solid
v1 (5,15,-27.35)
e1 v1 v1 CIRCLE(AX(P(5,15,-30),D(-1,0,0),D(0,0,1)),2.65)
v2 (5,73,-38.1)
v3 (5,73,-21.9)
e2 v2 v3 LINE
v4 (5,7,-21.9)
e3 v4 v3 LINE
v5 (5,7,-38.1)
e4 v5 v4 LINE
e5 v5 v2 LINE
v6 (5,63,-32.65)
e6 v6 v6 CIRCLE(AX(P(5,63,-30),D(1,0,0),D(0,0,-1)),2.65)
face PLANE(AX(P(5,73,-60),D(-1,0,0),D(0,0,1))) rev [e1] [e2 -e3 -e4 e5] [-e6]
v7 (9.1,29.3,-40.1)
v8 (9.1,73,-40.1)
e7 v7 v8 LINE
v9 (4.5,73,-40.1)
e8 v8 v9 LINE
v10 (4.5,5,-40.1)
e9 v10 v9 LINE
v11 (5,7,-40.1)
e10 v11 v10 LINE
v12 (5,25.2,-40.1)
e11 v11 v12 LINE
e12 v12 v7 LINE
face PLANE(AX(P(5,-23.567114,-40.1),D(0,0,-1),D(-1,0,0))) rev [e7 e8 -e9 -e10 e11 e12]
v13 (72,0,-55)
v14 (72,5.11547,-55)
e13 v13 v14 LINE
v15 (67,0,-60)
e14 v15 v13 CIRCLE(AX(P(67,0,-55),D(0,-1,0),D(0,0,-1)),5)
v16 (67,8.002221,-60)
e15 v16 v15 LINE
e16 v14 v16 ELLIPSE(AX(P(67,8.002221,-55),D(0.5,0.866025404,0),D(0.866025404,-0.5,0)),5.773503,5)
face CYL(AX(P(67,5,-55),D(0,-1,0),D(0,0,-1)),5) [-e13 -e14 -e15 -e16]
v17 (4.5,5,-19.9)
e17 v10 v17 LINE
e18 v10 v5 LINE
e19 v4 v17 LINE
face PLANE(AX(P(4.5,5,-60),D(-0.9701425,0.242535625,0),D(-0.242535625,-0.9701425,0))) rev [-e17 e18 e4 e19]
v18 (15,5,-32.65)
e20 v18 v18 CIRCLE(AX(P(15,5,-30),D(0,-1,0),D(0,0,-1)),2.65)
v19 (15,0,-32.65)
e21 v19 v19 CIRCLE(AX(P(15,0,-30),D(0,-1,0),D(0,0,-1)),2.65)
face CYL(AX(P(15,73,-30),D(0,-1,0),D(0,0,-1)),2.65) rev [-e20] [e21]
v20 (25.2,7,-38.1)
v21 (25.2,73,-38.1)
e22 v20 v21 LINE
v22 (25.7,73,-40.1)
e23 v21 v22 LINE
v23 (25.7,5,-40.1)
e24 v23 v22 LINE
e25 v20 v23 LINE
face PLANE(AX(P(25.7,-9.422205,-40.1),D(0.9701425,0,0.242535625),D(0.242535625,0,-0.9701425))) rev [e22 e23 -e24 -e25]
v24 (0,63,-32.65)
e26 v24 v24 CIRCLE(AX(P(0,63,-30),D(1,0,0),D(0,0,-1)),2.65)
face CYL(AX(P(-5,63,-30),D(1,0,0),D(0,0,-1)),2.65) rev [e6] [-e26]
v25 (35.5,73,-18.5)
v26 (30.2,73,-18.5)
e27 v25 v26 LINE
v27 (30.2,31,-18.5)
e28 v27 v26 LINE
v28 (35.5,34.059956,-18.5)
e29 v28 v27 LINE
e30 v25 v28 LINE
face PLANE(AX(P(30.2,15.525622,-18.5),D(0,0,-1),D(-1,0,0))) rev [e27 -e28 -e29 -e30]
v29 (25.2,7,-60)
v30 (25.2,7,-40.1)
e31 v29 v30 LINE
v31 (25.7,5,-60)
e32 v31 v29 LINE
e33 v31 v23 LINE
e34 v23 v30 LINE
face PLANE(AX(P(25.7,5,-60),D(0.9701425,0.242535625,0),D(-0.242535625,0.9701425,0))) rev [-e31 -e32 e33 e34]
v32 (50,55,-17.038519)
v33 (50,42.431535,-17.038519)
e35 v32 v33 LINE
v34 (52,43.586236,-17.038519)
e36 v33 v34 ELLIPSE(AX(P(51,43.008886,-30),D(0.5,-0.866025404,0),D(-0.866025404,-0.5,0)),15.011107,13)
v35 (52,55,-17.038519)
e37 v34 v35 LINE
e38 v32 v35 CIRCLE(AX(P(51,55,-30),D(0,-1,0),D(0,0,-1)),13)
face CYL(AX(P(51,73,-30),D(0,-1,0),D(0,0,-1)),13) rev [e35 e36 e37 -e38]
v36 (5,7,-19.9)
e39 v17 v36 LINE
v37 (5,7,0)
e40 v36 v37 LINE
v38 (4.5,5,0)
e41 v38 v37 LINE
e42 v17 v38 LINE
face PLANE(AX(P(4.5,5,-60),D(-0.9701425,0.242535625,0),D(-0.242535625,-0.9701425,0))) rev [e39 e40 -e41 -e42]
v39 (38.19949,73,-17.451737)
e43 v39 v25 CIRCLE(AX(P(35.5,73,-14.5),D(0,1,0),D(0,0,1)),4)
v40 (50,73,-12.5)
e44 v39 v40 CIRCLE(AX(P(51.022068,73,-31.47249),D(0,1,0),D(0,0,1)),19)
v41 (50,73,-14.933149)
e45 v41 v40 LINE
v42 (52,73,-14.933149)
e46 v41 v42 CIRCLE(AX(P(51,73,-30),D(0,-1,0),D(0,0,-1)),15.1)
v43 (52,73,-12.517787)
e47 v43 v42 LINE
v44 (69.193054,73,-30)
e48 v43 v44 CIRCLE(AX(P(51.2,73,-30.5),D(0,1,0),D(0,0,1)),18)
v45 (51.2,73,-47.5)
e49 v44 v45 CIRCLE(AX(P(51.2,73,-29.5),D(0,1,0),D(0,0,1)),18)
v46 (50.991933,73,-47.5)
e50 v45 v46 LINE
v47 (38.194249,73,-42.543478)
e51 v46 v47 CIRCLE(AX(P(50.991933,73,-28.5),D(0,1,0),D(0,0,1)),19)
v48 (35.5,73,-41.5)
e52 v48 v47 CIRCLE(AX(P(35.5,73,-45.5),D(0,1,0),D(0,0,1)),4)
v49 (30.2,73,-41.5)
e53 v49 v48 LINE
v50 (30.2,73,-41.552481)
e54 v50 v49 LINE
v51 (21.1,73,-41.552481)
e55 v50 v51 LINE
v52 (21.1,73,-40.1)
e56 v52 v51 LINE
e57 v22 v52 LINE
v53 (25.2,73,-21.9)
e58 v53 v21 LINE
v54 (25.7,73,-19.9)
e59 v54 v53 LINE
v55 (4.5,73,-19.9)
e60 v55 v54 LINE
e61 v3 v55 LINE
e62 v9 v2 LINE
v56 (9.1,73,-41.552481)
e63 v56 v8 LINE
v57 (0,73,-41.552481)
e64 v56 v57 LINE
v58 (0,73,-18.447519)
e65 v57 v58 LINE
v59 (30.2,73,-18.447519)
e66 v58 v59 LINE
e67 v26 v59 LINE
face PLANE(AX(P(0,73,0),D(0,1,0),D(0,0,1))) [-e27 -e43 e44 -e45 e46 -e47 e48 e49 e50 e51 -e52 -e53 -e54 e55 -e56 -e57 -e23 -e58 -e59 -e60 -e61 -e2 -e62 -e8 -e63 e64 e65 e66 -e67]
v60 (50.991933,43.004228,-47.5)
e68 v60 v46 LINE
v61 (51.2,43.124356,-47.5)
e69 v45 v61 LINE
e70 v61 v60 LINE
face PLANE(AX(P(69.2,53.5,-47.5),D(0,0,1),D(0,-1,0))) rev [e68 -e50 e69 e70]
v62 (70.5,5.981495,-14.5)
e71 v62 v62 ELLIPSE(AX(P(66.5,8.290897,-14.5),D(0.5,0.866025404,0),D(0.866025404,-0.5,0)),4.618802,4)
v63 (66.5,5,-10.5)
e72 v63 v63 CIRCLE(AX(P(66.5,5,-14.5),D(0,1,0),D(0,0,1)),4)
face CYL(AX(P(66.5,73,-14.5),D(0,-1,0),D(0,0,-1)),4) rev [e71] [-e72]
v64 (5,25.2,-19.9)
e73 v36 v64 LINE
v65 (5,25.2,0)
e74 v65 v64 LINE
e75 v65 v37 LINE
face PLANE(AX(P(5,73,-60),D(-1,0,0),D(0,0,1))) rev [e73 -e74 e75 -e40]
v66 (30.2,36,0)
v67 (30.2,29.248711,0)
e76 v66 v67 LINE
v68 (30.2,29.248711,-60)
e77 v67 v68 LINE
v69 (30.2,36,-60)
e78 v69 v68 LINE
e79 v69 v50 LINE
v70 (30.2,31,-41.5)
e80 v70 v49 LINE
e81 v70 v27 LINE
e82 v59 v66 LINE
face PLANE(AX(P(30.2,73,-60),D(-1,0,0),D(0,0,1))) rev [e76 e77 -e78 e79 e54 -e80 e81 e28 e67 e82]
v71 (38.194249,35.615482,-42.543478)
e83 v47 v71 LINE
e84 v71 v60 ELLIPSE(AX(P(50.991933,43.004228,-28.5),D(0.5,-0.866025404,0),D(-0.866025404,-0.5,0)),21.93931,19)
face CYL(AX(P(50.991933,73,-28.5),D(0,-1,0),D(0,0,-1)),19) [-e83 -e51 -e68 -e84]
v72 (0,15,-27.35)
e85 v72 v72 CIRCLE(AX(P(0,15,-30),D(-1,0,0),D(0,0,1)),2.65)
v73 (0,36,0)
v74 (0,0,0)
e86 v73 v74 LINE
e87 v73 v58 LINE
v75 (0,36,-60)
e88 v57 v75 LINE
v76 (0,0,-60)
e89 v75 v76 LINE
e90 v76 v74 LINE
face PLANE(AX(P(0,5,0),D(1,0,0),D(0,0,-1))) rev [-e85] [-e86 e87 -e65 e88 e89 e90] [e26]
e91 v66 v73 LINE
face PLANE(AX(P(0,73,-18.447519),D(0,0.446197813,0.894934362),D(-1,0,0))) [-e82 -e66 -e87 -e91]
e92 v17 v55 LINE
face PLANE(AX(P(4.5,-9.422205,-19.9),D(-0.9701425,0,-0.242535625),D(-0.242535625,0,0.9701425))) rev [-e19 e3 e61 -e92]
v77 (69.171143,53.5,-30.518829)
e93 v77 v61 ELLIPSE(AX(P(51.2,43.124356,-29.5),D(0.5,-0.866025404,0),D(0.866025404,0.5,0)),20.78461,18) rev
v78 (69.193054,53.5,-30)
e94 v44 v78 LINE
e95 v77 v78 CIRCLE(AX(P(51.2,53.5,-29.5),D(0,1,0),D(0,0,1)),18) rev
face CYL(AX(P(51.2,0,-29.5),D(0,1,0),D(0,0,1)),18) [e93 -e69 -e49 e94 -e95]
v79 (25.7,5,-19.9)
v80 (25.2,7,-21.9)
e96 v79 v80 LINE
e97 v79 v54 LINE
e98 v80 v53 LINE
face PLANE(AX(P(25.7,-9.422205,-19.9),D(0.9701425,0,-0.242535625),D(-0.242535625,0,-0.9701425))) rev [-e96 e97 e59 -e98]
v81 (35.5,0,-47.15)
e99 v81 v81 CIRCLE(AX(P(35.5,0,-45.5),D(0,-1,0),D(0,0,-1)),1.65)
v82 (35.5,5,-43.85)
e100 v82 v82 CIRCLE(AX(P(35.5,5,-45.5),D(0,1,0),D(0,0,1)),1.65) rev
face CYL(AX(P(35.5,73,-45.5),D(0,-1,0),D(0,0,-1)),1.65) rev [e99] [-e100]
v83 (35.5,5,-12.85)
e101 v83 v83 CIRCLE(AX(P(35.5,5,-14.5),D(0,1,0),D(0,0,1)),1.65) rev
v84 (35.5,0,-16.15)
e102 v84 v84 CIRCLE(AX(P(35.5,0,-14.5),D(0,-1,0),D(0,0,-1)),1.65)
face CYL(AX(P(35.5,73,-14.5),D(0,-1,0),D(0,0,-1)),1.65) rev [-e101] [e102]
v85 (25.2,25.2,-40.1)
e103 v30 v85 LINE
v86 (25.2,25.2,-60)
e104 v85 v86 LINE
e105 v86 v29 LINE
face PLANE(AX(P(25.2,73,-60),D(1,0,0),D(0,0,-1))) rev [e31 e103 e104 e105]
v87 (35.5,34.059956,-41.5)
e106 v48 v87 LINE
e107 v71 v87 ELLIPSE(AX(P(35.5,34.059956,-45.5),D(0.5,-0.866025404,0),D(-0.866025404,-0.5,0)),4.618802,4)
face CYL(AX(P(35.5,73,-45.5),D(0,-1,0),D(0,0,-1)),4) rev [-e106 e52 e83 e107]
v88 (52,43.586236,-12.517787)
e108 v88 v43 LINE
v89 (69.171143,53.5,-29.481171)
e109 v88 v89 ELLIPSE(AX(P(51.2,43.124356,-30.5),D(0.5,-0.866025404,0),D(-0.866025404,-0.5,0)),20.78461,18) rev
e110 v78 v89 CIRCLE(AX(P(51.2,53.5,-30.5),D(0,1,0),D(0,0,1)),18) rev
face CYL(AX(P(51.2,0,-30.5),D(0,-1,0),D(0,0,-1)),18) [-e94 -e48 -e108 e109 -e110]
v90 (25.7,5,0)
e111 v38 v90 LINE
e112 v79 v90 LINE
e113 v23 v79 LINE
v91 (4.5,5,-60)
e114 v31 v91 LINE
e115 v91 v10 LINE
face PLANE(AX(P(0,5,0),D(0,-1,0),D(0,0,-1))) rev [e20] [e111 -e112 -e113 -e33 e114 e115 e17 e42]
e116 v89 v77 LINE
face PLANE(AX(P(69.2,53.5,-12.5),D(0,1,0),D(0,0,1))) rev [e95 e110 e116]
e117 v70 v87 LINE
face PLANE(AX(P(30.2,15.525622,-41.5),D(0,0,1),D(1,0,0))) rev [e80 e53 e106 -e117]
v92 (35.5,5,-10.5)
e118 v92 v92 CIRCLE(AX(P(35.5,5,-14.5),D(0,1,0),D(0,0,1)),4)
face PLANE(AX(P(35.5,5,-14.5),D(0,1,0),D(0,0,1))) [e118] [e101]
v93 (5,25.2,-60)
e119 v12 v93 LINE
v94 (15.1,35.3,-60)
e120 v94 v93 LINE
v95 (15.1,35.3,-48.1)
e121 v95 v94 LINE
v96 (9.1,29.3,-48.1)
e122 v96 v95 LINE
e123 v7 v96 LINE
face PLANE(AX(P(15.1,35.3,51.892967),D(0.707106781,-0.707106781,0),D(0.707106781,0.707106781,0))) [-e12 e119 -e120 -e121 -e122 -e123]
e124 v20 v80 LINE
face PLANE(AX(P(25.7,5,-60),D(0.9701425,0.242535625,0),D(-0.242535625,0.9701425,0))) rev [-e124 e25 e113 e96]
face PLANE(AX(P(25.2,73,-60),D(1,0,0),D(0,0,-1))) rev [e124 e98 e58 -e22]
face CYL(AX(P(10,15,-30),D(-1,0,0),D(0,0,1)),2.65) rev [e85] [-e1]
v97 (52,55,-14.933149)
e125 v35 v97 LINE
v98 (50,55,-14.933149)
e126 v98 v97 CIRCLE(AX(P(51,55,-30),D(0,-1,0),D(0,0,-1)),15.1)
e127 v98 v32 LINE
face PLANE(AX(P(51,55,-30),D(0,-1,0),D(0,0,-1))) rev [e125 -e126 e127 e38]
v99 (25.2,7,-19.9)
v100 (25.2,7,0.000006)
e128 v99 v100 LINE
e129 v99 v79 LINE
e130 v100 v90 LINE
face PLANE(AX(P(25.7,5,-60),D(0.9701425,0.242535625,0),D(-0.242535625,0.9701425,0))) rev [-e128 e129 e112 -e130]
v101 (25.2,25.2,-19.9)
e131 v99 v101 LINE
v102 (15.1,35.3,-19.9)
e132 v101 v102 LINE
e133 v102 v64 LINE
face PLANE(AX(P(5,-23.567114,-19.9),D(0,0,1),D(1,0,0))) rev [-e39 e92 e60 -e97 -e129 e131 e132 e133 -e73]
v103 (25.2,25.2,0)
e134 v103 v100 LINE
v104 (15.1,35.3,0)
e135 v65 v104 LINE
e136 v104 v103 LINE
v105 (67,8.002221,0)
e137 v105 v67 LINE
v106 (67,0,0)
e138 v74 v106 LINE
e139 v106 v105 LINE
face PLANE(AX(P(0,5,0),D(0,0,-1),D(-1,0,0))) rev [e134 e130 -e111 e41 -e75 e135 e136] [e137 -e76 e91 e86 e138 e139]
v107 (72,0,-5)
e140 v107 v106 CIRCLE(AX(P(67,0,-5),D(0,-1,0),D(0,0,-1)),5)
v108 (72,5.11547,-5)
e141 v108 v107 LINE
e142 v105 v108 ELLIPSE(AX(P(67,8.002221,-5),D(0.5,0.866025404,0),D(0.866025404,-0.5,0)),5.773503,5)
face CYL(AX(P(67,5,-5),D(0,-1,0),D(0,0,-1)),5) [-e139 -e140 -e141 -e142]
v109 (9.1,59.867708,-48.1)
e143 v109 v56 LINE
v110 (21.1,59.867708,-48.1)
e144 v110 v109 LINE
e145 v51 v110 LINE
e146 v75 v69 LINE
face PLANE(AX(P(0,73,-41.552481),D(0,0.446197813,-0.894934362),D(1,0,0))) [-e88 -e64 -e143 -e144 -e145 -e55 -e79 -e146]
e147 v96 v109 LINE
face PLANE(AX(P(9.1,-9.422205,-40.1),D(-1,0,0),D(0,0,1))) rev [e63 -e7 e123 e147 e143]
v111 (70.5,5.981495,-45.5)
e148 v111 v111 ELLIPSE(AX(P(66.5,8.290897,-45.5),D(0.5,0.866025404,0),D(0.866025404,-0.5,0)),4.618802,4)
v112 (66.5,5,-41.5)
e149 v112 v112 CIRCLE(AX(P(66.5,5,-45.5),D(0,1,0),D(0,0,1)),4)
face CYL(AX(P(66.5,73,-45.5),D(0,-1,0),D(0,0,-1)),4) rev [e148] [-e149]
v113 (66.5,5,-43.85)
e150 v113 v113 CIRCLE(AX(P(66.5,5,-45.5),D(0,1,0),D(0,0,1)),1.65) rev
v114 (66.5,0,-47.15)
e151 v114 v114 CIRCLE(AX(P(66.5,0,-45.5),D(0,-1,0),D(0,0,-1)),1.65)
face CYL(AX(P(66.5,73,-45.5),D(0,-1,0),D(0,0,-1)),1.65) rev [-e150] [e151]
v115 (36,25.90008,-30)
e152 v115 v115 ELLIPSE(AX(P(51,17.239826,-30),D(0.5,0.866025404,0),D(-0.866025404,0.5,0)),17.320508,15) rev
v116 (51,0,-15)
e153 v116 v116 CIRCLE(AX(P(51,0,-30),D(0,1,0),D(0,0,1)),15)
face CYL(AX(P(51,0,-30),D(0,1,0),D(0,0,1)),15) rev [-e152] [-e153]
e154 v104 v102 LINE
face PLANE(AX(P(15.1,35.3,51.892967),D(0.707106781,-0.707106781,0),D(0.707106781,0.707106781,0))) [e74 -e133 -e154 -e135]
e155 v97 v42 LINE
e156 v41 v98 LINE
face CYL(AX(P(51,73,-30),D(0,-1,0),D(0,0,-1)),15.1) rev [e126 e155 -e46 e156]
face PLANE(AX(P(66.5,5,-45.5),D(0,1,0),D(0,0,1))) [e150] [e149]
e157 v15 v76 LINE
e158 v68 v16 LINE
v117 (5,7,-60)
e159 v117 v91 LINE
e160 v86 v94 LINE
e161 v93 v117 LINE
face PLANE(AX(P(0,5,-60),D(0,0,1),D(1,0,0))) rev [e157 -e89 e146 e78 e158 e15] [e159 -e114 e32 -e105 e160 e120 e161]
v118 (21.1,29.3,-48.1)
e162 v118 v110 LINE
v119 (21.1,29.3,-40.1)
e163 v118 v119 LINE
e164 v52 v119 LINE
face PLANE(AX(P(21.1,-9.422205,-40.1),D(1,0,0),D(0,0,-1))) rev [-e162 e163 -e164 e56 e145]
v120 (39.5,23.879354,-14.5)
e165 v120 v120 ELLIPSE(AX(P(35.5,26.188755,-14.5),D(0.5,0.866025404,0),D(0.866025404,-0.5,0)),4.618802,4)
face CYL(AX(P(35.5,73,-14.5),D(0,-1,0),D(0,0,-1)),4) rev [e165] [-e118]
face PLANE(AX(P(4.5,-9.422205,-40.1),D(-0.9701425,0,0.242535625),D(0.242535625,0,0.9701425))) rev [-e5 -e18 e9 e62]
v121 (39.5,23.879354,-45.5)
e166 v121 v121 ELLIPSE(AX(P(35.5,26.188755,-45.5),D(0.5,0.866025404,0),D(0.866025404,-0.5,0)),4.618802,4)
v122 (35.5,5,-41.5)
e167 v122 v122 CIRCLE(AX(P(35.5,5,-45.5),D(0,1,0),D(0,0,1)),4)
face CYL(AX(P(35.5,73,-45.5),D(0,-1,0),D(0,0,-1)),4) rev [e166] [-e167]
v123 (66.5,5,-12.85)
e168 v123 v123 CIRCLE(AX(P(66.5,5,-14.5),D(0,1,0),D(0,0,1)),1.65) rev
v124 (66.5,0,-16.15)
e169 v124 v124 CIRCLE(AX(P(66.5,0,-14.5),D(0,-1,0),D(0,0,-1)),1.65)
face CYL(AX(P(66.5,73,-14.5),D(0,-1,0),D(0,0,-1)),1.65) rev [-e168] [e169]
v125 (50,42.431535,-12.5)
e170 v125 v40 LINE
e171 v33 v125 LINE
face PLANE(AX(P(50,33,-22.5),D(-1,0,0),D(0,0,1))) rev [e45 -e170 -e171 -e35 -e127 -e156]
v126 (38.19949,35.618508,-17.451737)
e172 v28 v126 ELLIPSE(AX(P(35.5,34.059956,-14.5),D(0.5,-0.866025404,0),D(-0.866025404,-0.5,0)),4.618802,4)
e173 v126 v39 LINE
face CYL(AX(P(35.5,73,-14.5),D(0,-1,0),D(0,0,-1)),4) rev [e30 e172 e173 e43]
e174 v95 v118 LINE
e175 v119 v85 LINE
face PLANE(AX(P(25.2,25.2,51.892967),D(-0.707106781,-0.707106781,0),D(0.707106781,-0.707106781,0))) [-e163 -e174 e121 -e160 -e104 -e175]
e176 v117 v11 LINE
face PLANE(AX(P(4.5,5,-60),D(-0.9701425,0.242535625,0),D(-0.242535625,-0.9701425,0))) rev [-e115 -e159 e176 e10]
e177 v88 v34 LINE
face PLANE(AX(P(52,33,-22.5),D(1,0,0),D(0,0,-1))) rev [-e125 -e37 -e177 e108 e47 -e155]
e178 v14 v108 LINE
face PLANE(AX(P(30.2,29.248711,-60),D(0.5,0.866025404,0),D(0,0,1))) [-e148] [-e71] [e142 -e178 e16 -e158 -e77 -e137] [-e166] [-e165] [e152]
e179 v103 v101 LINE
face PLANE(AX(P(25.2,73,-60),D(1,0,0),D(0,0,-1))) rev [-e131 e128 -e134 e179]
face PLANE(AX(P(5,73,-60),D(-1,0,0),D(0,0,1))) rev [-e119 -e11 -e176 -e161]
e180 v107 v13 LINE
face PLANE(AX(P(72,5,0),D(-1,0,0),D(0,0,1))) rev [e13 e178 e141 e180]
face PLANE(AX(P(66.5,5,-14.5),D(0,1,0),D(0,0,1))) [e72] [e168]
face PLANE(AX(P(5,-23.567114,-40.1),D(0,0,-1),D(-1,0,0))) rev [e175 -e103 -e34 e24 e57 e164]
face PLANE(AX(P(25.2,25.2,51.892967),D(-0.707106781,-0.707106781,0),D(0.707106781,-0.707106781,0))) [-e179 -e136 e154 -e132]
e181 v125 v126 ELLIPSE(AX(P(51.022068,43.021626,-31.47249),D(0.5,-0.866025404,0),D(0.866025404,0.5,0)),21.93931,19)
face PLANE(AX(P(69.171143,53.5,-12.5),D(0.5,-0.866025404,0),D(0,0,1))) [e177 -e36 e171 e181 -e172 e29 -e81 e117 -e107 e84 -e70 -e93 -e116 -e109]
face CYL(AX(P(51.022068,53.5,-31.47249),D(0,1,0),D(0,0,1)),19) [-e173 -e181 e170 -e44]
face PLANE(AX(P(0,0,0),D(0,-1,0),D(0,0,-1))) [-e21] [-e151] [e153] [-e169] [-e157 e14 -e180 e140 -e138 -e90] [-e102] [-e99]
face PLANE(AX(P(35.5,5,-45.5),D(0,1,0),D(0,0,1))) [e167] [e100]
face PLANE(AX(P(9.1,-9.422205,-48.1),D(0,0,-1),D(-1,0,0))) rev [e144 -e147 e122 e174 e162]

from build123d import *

# Parameters (mm, degrees)
SKETCH1_W               = 72
SKETCH1_H               = 60
BOSS_EXTRUDE1_DEPTH     = 5
SKETCH2_W               = 5
SKETCH2_H               = 60
BOSS_EXTRUDE2_DEPTH     = 68
SKETCH3_W               = 5
SKETCH3_H               = 60
BOSS_EXTRUDE3_DEPTH     = 68
BOSS_EXTRUDE4_DEPTH     = 60
CHAMFER1_SIZE           = 42
CHAMFER1_SIZE_2         = 24.248711306
CUT_EXTRUDE8_REACH      = 120.798
SKETCH12_W              = 20.2
SKETCH12_H              = 20.2
CUT_EXTRUDE1_DEPTH      = 116.792918609
CUT_EXTRUDE1_DEPTH_BACK = 116.792918609
SKETCH5_R               = 15
SKETCH8_R               = 2.65
CUT_EXTRUDE5_DEPTH      = 10
CUT_EXTRUDE6_DEPTH      = 119.798148134
CUT_EXTRUDE6_DEPTH_BACK = 119.798148134
SKETCH9_R               = 2.65
FILLET1_R               = 5
SKETCH10_R              = 2.65
CUT_EXTRUDE7_DEPTH      = 10
CUT_EXTRUDE9_DEPTH      = 119.798148134
CUT_EXTRUDE9_DEPTH_BACK = 119.798148134
CUT_EXTRUDE10_REACH     = 120.798
SKETCH14_W              = 12
SKETCH14_H              = 8
SKETCH15_W              = 35
SKETCH15_H              = 19.5
BOSS_EXTRUDE5_DEPTH     = 39
SKETCH16_R              = 15.1
CUT_EXTRUDE11_DEPTH     = 109.669222874
SKETCH17_R              = 13
CUT_EXTRUDE12_DEPTH     = 108.917792787
FILLET2_R               = 18
CHAMFER2_START          = 51.76396
CHAMFER2_OUTLINE_R      = 13
CHAMFER2_DEPTH          = 1.73604
CHAMFER2_START_2        = 31
CHAMFER2_2_OUTLINE_R    = 13
CHAMFER2_2_DEPTH        = 20.76396
CHAMFER2_START_3        = -47.5
CHAMFER2_3_DEPTH        = 35
SKETCH6_R               = 1.65
CUT_EXTRUDE2_DEPTH      = 119.798148134
SKETCH7_R               = 4
CUT_EXTRUDE4_DEPTH      = 116.792918609
SKETCH18_W              = 2
SKETCH18_H              = 15
CUT_EXTRUDE13_DEPTH     = 40
CHAMFER3_DEPTH          = 34.854175091
CUT_EXTRUDE14_REACH     = 120.798
SKETCH19_W              = 5.3
SKETCH19_H              = 10
FILLET3_R               = 19


with BuildPart() as part:
    # Sketch1 → Boss-Extrude1 (new body)
    with BuildSketch(Plane(origin=(0, 0, 0), x_dir=(1, 0, 0), z_dir=(0, 1, 0))):
        with Locations((36, 30)):
            Rectangle(SKETCH1_W, SKETCH1_H)
    extrude(amount=BOSS_EXTRUDE1_DEPTH)

    # Sketch2 → Boss-Extrude2 (add)
    with BuildSketch(Plane(origin=(0, 5, 0), x_dir=(1, 0, 0), z_dir=(0, 1, 0))):
        with Locations((2.5, 30)):
            Rectangle(SKETCH2_W, SKETCH2_H)
    extrude(amount=BOSS_EXTRUDE2_DEPTH)

    # Sketch3 → Boss-Extrude3 (add)
    with BuildSketch(Plane(origin=(0, 5, 0), x_dir=(1, 0, 0), z_dir=(0, 1, 0))):
        with Locations((27.7, 30)):
            Rectangle(SKETCH3_W, SKETCH3_H)
    extrude(amount=BOSS_EXTRUDE3_DEPTH)

    # Sketch11 → Boss-Extrude4 (add)
    with BuildSketch(Plane(origin=(0, 0, -60), x_dir=(-1, 0, 0), z_dir=(0, 0, -1))):
        Polygon((-25.2, 25.2), (-15.1, 35.3), (-5, 25.2), (-5, 73), (-25.2, 73), align=None)
    extrude(amount=-BOSS_EXTRUDE4_DEPTH)

    # Chamfer1
    # the kernel refuses this chamfer: 42, 24.248711306 mm, written as the material it adds along each edge
    with BuildSketch(Plane(origin=(30.2, 5, -60), x_dir=(1, 0, 0), z_dir=(0, 0, 1))) as chamfer1_piece_1_section:
        Polygon((CHAMFER1_SIZE, 0), (0, CHAMFER1_SIZE_2), (0, 0), align=None)
    chamfer1_piece_1 = extrude(amount=60, mode=Mode.PRIVATE)
    chamfer1_piece_1 = split(chamfer1_piece_1, bisect_by=Plane(origin=(72, 5, -60), z_dir=(-1, 0, 0)), keep=Keep.TOP, mode=Mode.PRIVATE)
    add(chamfer1_piece_1)

    # Cut-Extrude8: up to this face of the body (flat: up to its plane)
    cut_extrude8_end = Plane(part.part.faces().sort_by_distance((15.1, 5, -30))[0])
    # Sketch12 → Cut-Extrude8 (cut, up to the picked face)
    with BuildSketch(Plane(origin=(0, 73, 0), x_dir=(1, 0, 0), z_dir=(0, 1, 0)), mode=Mode.PRIVATE) as cut_extrude8_sk1:
        with Locations((15.1, 30)):
            Rectangle(SKETCH12_W, SKETCH12_H)
    cut_extrude8_tool1 = split(extrude(cut_extrude8_sk1.sketch, amount=-CUT_EXTRUDE8_REACH, mode=Mode.PRIVATE), bisect_by=cut_extrude8_end, keep=Keep.BOTH, mode=Mode.PRIVATE)
    add(cut_extrude8_tool1.solids().sort_by(Axis((15.1, 73, -30), (0, -1, 0)))[0], mode=Mode.SUBTRACT)

    # Sketch5 → Cut-Extrude1 (cut, two sides: drawn at the far end of the back side and taken through both)
    with BuildSketch(Plane(origin=(0, 5, 0), x_dir=(1, 0, 0), z_dir=(0, 1, 0)).offset(-CUT_EXTRUDE1_DEPTH_BACK)):
        with Locations(Location((51, 30, 0), (0, 0, 270))):
            Circle(SKETCH5_R)
    extrude(amount=CUT_EXTRUDE1_DEPTH + CUT_EXTRUDE1_DEPTH_BACK, mode=Mode.SUBTRACT)

    # Sketch8 → Cut-Extrude5 (cut)
    with BuildSketch(Plane(origin=(5, 0, 0), x_dir=(0, 0, -1), z_dir=(1, 0, 0))):
        with Locations((30, 63)):
            Circle(SKETCH8_R)
    extrude(amount=-CUT_EXTRUDE5_DEPTH, mode=Mode.SUBTRACT)

    # Sketch9 → Cut-Extrude6 (cut, two sides: drawn at the far end of the back side and taken through both)
    with BuildSketch(Plane.XZ.offset(-CUT_EXTRUDE6_DEPTH_BACK)):
        with Locations(Location((15, -30, 0), (0, 0, 270))):
            Circle(SKETCH9_R)
    extrude(amount=CUT_EXTRUDE6_DEPTH + CUT_EXTRUDE6_DEPTH_BACK, mode=Mode.SUBTRACT)

    # Fillet1
    fillet1_edges = [part.edges().sort_by_distance(p)[0] for p in [
        (72, 2.557735027, -60),
        (72, 2.557735027, 0),
    ]]
    fillet(fillet1_edges, radius=FILLET1_R)

    # Sketch10 → Cut-Extrude7 (cut)
    with BuildSketch(Plane.ZY):
        with Locations((-30, 15)):
            Circle(SKETCH10_R)
    extrude(amount=-CUT_EXTRUDE7_DEPTH, mode=Mode.SUBTRACT)

    # Sketch13 → Cut-Extrude9 (cut, two sides: drawn at the far end of the back side and taken through both)
    with BuildSketch(Plane.XY.offset(-CUT_EXTRUDE9_DEPTH_BACK)):
        Polygon((5, 5), (4.5, 5), (5, 7), align=None)
        Polygon((25.2, 5), (25.7, 5), (25.2, 7), align=None)
    extrude(amount=CUT_EXTRUDE9_DEPTH + CUT_EXTRUDE9_DEPTH_BACK, mode=Mode.SUBTRACT)

    # Cut-Extrude10: up to this face of the body (flat: up to its plane)
    cut_extrude10_end = Plane(part.part.faces().sort_by_distance((24.566909169, 5, -30))[0])
    # Sketch14 → Cut-Extrude10 (cut, up to the picked face)
    with BuildSketch(Plane(origin=(0, 73, 0), x_dir=(1, 0, 0), z_dir=(0, 1, 0)), mode=Mode.PRIVATE) as cut_extrude10_sk1:
        with Locations((15.1, 44.1)):
            Rectangle(SKETCH14_W, SKETCH14_H)
    cut_extrude10_tool1 = split(extrude(cut_extrude10_sk1.sketch, amount=-CUT_EXTRUDE10_REACH, mode=Mode.PRIVATE), bisect_by=cut_extrude10_end, keep=Keep.BOTH, mode=Mode.PRIVATE)
    # Sketch14 → Cut-Extrude10 (cut, up to the picked face)
    with BuildSketch(Plane(origin=(0, 73, 0), x_dir=(1, 0, 0), z_dir=(0, 1, 0)), mode=Mode.PRIVATE) as cut_extrude10_sk2:
        Polygon((25.2, 19.9), (25.7, 19.9), (25.2, 21.9), align=None)
    cut_extrude10_tool2 = split(extrude(cut_extrude10_sk2.sketch, amount=-CUT_EXTRUDE10_REACH, mode=Mode.PRIVATE), bisect_by=cut_extrude10_end, keep=Keep.BOTH, mode=Mode.PRIVATE)
    # Sketch14 → Cut-Extrude10 (cut, up to the picked face)
    with BuildSketch(Plane(origin=(0, 73, 0), x_dir=(1, 0, 0), z_dir=(0, 1, 0)), mode=Mode.PRIVATE) as cut_extrude10_sk3:
        Polygon((5, 19.9), (4.5, 19.9), (5, 21.9), align=None)
    cut_extrude10_tool3 = split(extrude(cut_extrude10_sk3.sketch, amount=-CUT_EXTRUDE10_REACH, mode=Mode.PRIVATE), bisect_by=cut_extrude10_end, keep=Keep.BOTH, mode=Mode.PRIVATE)
    # Sketch14 → Cut-Extrude10 (cut, up to the picked face)
    with BuildSketch(Plane(origin=(0, 73, 0), x_dir=(1, 0, 0), z_dir=(0, 1, 0)), mode=Mode.PRIVATE) as cut_extrude10_sk4:
        Polygon((25.2, 40.1), (25.7, 40.1), (25.2, 38.1), align=None)
    cut_extrude10_tool4 = split(extrude(cut_extrude10_sk4.sketch, amount=-CUT_EXTRUDE10_REACH, mode=Mode.PRIVATE), bisect_by=cut_extrude10_end, keep=Keep.BOTH, mode=Mode.PRIVATE)
    # Sketch14 → Cut-Extrude10 (cut, up to the picked face)
    with BuildSketch(Plane(origin=(0, 73, 0), x_dir=(1, 0, 0), z_dir=(0, 1, 0)), mode=Mode.PRIVATE) as cut_extrude10_sk5:
        Polygon((5, 40.1), (4.5, 40.1), (5, 38.1), align=None)
    cut_extrude10_tool5 = split(extrude(cut_extrude10_sk5.sketch, amount=-CUT_EXTRUDE10_REACH, mode=Mode.PRIVATE), bisect_by=cut_extrude10_end, keep=Keep.BOTH, mode=Mode.PRIVATE)
    add(cut_extrude10_tool1.solids().sort_by(Axis((15.1, 73, -44.1), (0, -1, 0)))[0], mode=Mode.SUBTRACT)
    add(cut_extrude10_tool2.solids().sort_by(Axis((25.366667, 73, -20.566667), (0, -1, 0)))[0], mode=Mode.SUBTRACT)
    add(cut_extrude10_tool3.solids().sort_by(Axis((4.833333, 73, -20.566667), (0, -1, 0)))[0], mode=Mode.SUBTRACT)
    add(cut_extrude10_tool4.solids().sort_by(Axis((25.366667, 73, -39.433333), (0, -1, 0)))[0], mode=Mode.SUBTRACT)
    add(cut_extrude10_tool5.solids().sort_by(Axis((4.833333, 73, -39.433333), (0, -1, 0)))[0], mode=Mode.SUBTRACT)

    # Sketch15 → Boss-Extrude5 (add)
    with BuildSketch(Plane(origin=(30.2, 0, 0), x_dir=(0, 0, -1), z_dir=(1, 0, 0))):
        with Locations((30, 63.25)):
            Rectangle(SKETCH15_W, SKETCH15_H)
    extrude(amount=BOSS_EXTRUDE5_DEPTH)

    # Sketch16 → Cut-Extrude11 (cut, through all)
    with BuildSketch(Plane.XZ.offset(-55)):
        with Locations(Location((51, -30, 0), (0, 0, 270))):
            Circle(SKETCH16_R)
    extrude(amount=-CUT_EXTRUDE11_DEPTH, mode=Mode.SUBTRACT)

    # Sketch17 → Cut-Extrude12 (cut, through all)
    with BuildSketch(Plane.XZ.offset(-53.5)):
        with Locations(Location((51, -30, 0), (0, 0, 270))):
            Circle(SKETCH17_R)
    extrude(amount=-CUT_EXTRUDE12_DEPTH, mode=Mode.SUBTRACT)

    # Fillet2
    # the kernel refuses this fillet: 18 mm, written as the material it takes off along each edge
    with BuildSketch(Plane(origin=(69.2, 53.5, -47.5), x_dir=(-1, 0, 0), z_dir=(0, 1, 0)), Plane(origin=(69.2, 118, -12.5), x_dir=(-1, 0, 0), z_dir=(0, -1, 0))) as fillet2_piece_1:
        with BuildLine():
            CenterArc((FILLET2_R, FILLET2_R), FILLET2_R, 180, 90)
            Line((0, FILLET2_R), (0, 0))
            Line((0, 0), (FILLET2_R, 0))
        make_face()
    extrude(amount=64.5, mode=Mode.SUBTRACT)

    # Chamfer2: read off the stored shape, not the designer's step
    # Chamfer2 outline → Chamfer2 (add)
    with BuildSketch(Plane(origin=(0, 0, 0), x_dir=(1, 0, 0), z_dir=(0, 1, 0)).offset(CHAMFER2_START)):
        with BuildLine():
            Line((30.2, 12.5), (51.2, 12.5))
            ThreePointArc((51.2, 12.5), (63.749900398, 17.596512099), (69.193054215, 30))
            ThreePointArc((69.193054215, 30), (63.749900398, 42.403487901), (51.2, 47.5))
            Line((51.2, 47.5), (30.2, 47.5))
            Line((30.2, 47.5), (30.2, 12.5))
        make_face()
        with Locations((51, 30)):
            Circle(CHAMFER2_OUTLINE_R, mode=Mode.SUBTRACT)
    extrude(amount=CHAMFER2_DEPTH)

    # Chamfer2 2 outline → Chamfer2 2 (add)
    with BuildSketch(Plane(origin=(0, 0, 0), x_dir=(1, 0, 0), z_dir=(0, 1, 0)).offset(CHAMFER2_START_2)):
        with BuildLine():
            Line((30.2, 12.5), (51.2, 12.5))
            ThreePointArc((51.2, 12.5), (63.749900398, 17.596512099), (69.193054215, 30))
            ThreePointArc((69.193054215, 30), (63.749900398, 42.403487901), (51.2, 47.5))
            Line((51.2, 47.5), (30.2, 47.5))
            Line((30.2, 47.5), (30.2, 12.5))
        make_face()
        with Locations((51, 30)):
            Circle(CHAMFER2_2_OUTLINE_R, mode=Mode.SUBTRACT)
    extrude(amount=CHAMFER2_2_DEPTH)

    # Chamfer2 3 outline → Chamfer2 3 (cut)
    with BuildSketch(Plane.XY.offset(CHAMFER2_START_3)):
        Polygon((71, 53.5), (69.17114317, 53.5), (30.2, 31), (71, 31), align=None)
    extrude(amount=CHAMFER2_3_DEPTH, mode=Mode.SUBTRACT)

    # Sketch6 → Cut-Extrude2 (cut, through all)
    with BuildSketch(Plane.XZ):
        with Locations(Location((66.5, -14.5, 0), (0, 0, 270))):
            Circle(SKETCH6_R)
        with Locations(Location((66.5, -45.5, 0), (0, 0, 270))):
            Circle(SKETCH6_R)
        with Locations(Location((35.5, -45.5, 0), (0, 0, 270))):
            Circle(SKETCH6_R)
        with Locations(Location((35.5, -14.5, 0), (0, 0, 270))):
            Circle(SKETCH6_R)
    extrude(amount=-CUT_EXTRUDE2_DEPTH, mode=Mode.SUBTRACT)

    # Sketch7 → Cut-Extrude4 (cut, through all)
    with BuildSketch(Plane(origin=(0, 5, 0), x_dir=(1, 0, 0), z_dir=(0, 1, 0))):
        with Locations((66.5, 45.5)):
            Circle(SKETCH7_R)
        with Locations((66.5, 14.5)):
            Circle(SKETCH7_R)
        with Locations((35.5, 14.5)):
            Circle(SKETCH7_R)
        with Locations((35.5, 45.5)):
            Circle(SKETCH7_R)
    extrude(amount=CUT_EXTRUDE4_DEPTH, mode=Mode.SUBTRACT)

    # Sketch18 → Cut-Extrude13 (cut)
    with BuildSketch(Plane(origin=(0, 73, 0), x_dir=(1, 0, 0), z_dir=(0, 1, 0))):
        with Locations((51, 15)):
            Rectangle(SKETCH18_W, SKETCH18_H)
    extrude(amount=-CUT_EXTRUDE13_DEPTH, mode=Mode.SUBTRACT)

    # Chamfer3: read off the stored shape, not the designer's step
    # Chamfer3 outline → Chamfer3 (cut)
    with BuildSketch(Plane.YZ):
        Polygon((73, -41.552480502), (36, -60), (73, -60), align=None)
        Polygon((73, -18.447519498), (73, 0), (36, 0), align=None)
    extrude(amount=CHAMFER3_DEPTH, mode=Mode.SUBTRACT)

    # Cut-Extrude14: up to this plane
    cut_extrude14_end = Plane(origin=(69.17114317, 53.5, -12.5), z_dir=(0.4999999999999951, -0.8660254037844415, 0))
    # Sketch19 → Cut-Extrude14 (cut, up to the surface)
    with BuildSketch(Plane(origin=(0, 73, 0), x_dir=(1, 0, 0), z_dir=(0, 1, 0)), mode=Mode.PRIVATE) as cut_extrude14_sk1:
        with Locations((32.85, 46.5)):
            Rectangle(SKETCH19_W, SKETCH19_H)
    cut_extrude14_tool1 = split(extrude(cut_extrude14_sk1.sketch, amount=-CUT_EXTRUDE14_REACH, mode=Mode.PRIVATE), bisect_by=cut_extrude14_end, keep=Keep.BOTH, mode=Mode.PRIVATE)
    add(cut_extrude14_tool1.solids().sort_by_distance((32.85, 73, -46.5))[0], mode=Mode.SUBTRACT)
    # Sketch19 → Cut-Extrude14 (cut, up to the surface)
    with BuildSketch(Plane(origin=(0, 73, 0), x_dir=(1, 0, 0), z_dir=(0, 1, 0)), mode=Mode.PRIVATE) as cut_extrude14_sk2:
        with Locations((32.85, 13.5)):
            Rectangle(SKETCH19_W, SKETCH19_H)
    cut_extrude14_tool2 = split(extrude(cut_extrude14_sk2.sketch, amount=-CUT_EXTRUDE14_REACH, mode=Mode.PRIVATE), bisect_by=cut_extrude14_end, keep=Keep.BOTH, mode=Mode.PRIVATE)
    add(cut_extrude14_tool2.solids().sort_by_distance((32.85, 73, -13.5))[0], mode=Mode.SUBTRACT)

    # Fillet3
    # the kernel refuses this fillet: 19 mm, written as the material it takes off along each edge
    with BuildSketch(Plane(origin=(38.964101615, 103.069579424, -47.5), x_dir=(-0.15348078303454, 0, 0.9881516327159028), z_dir=(0, -1, 0))) as fillet3_piece_1:
        with BuildLine():
            CenterArc((16.928839983, -14.801456479), FILLET3_R, 128.828697274, 42.342605452)
            Line((-1.846041038, -11.885321601), (0, 0))
            ThreePointArc((0, 0), (2.507976294, -0.883903899), (5.015952588, 0))
        make_face()
    extrude(amount=49.569579424, mode=Mode.SUBTRACT)
    with BuildSketch(Plane(origin=(38.964101615, 100.589745962, -12.5), x_dir=(1, 0, 0), z_dir=(0, -1, 0))) as fillet3_piece_2:
        with BuildLine():
            CenterArc((12.057965975, -18.972490027), FILLET3_R, 93.083602032, 39.360648152)
            ThreePointArc((-0.764611599, -4.951737396), (0.489047921, -2.610416859), (0, 0))
            Line((0, 0), (11.035898385, 0))
        make_face()
    extrude(amount=47.089745962, mode=Mode.SUBTRACT)
    with BuildSketch(Plane(origin=(38.964101615, 53.5, -12.5), x_dir=(1, 0, 0), z_dir=(0, -1, 0))) as fillet3_piece_3:
        with BuildLine():
            CenterArc((12.057965975, -18.972490027), FILLET3_R, 93.083602032, 39.360648152)
            ThreePointArc((-0.764611599, -4.951737396), (0.489047921, -2.610416859), (0, 0))
            Line((0, 0), (11.035898385, 0))
        make_face()
    extrude(amount=1.73604, mode=Mode.SUBTRACT)
    with BuildSketch(Plane(origin=(38.964101615, 51.76396, -12.5), x_dir=(1, 0, 0), z_dir=(0, -1, 0))) as fillet3_piece_4_section:
        with BuildLine():
            CenterArc((12.057965975, -18.972490027), FILLET3_R, 93.083602032, 39.360648152)
            ThreePointArc((-0.764611599, -4.951737396), (0.489047921, -2.610416859), (0, 0))
            Line((0, 0), (11.035898385, 0))
        make_face()
    fillet3_piece_4 = extrude(amount=43.293749535, mode=Mode.PRIVATE)
    fillet3_piece_4 = split(fillet3_piece_4, bisect_by=Plane(origin=(45.764134633, 39.98595732, -12.5), z_dir=(-0.5000000000028844, 0.8660254037827734, 0)), keep=Keep.TOP, mode=Mode.PRIVATE)
    add(fillet3_piece_4, mode=Mode.SUBTRACT)
    with BuildSketch(Plane(origin=(38.964101615, 53.5, -47.5), x_dir=(1, 0, 0), z_dir=(0, -1, 0))) as fillet3_piece_5_section:
        with BuildLine():
            CenterArc((12.02783177, 19), FILLET3_R, 227.657394548, 42.342605452)
            ThreePointArc((-0.769852331, 4.956521739), (0.488504916, 2.613923132), (0, 0))
            Line((0, 0), (12.02783177, 0))
        make_face()
    fillet3_piece_5 = extrude(amount=31.805619424, mode=Mode.PRIVATE)
    fillet3_piece_5 = split(fillet3_piece_5, bisect_by=Plane(origin=(46.515862004, 40.41996732, -47.5), z_dir=(-0.5000000000028844, 0.8660254037827734, 0)), keep=Keep.TOP, mode=Mode.PRIVATE)
    add(fillet3_piece_5, mode=Mode.SUBTRACT)


solid = part.part
